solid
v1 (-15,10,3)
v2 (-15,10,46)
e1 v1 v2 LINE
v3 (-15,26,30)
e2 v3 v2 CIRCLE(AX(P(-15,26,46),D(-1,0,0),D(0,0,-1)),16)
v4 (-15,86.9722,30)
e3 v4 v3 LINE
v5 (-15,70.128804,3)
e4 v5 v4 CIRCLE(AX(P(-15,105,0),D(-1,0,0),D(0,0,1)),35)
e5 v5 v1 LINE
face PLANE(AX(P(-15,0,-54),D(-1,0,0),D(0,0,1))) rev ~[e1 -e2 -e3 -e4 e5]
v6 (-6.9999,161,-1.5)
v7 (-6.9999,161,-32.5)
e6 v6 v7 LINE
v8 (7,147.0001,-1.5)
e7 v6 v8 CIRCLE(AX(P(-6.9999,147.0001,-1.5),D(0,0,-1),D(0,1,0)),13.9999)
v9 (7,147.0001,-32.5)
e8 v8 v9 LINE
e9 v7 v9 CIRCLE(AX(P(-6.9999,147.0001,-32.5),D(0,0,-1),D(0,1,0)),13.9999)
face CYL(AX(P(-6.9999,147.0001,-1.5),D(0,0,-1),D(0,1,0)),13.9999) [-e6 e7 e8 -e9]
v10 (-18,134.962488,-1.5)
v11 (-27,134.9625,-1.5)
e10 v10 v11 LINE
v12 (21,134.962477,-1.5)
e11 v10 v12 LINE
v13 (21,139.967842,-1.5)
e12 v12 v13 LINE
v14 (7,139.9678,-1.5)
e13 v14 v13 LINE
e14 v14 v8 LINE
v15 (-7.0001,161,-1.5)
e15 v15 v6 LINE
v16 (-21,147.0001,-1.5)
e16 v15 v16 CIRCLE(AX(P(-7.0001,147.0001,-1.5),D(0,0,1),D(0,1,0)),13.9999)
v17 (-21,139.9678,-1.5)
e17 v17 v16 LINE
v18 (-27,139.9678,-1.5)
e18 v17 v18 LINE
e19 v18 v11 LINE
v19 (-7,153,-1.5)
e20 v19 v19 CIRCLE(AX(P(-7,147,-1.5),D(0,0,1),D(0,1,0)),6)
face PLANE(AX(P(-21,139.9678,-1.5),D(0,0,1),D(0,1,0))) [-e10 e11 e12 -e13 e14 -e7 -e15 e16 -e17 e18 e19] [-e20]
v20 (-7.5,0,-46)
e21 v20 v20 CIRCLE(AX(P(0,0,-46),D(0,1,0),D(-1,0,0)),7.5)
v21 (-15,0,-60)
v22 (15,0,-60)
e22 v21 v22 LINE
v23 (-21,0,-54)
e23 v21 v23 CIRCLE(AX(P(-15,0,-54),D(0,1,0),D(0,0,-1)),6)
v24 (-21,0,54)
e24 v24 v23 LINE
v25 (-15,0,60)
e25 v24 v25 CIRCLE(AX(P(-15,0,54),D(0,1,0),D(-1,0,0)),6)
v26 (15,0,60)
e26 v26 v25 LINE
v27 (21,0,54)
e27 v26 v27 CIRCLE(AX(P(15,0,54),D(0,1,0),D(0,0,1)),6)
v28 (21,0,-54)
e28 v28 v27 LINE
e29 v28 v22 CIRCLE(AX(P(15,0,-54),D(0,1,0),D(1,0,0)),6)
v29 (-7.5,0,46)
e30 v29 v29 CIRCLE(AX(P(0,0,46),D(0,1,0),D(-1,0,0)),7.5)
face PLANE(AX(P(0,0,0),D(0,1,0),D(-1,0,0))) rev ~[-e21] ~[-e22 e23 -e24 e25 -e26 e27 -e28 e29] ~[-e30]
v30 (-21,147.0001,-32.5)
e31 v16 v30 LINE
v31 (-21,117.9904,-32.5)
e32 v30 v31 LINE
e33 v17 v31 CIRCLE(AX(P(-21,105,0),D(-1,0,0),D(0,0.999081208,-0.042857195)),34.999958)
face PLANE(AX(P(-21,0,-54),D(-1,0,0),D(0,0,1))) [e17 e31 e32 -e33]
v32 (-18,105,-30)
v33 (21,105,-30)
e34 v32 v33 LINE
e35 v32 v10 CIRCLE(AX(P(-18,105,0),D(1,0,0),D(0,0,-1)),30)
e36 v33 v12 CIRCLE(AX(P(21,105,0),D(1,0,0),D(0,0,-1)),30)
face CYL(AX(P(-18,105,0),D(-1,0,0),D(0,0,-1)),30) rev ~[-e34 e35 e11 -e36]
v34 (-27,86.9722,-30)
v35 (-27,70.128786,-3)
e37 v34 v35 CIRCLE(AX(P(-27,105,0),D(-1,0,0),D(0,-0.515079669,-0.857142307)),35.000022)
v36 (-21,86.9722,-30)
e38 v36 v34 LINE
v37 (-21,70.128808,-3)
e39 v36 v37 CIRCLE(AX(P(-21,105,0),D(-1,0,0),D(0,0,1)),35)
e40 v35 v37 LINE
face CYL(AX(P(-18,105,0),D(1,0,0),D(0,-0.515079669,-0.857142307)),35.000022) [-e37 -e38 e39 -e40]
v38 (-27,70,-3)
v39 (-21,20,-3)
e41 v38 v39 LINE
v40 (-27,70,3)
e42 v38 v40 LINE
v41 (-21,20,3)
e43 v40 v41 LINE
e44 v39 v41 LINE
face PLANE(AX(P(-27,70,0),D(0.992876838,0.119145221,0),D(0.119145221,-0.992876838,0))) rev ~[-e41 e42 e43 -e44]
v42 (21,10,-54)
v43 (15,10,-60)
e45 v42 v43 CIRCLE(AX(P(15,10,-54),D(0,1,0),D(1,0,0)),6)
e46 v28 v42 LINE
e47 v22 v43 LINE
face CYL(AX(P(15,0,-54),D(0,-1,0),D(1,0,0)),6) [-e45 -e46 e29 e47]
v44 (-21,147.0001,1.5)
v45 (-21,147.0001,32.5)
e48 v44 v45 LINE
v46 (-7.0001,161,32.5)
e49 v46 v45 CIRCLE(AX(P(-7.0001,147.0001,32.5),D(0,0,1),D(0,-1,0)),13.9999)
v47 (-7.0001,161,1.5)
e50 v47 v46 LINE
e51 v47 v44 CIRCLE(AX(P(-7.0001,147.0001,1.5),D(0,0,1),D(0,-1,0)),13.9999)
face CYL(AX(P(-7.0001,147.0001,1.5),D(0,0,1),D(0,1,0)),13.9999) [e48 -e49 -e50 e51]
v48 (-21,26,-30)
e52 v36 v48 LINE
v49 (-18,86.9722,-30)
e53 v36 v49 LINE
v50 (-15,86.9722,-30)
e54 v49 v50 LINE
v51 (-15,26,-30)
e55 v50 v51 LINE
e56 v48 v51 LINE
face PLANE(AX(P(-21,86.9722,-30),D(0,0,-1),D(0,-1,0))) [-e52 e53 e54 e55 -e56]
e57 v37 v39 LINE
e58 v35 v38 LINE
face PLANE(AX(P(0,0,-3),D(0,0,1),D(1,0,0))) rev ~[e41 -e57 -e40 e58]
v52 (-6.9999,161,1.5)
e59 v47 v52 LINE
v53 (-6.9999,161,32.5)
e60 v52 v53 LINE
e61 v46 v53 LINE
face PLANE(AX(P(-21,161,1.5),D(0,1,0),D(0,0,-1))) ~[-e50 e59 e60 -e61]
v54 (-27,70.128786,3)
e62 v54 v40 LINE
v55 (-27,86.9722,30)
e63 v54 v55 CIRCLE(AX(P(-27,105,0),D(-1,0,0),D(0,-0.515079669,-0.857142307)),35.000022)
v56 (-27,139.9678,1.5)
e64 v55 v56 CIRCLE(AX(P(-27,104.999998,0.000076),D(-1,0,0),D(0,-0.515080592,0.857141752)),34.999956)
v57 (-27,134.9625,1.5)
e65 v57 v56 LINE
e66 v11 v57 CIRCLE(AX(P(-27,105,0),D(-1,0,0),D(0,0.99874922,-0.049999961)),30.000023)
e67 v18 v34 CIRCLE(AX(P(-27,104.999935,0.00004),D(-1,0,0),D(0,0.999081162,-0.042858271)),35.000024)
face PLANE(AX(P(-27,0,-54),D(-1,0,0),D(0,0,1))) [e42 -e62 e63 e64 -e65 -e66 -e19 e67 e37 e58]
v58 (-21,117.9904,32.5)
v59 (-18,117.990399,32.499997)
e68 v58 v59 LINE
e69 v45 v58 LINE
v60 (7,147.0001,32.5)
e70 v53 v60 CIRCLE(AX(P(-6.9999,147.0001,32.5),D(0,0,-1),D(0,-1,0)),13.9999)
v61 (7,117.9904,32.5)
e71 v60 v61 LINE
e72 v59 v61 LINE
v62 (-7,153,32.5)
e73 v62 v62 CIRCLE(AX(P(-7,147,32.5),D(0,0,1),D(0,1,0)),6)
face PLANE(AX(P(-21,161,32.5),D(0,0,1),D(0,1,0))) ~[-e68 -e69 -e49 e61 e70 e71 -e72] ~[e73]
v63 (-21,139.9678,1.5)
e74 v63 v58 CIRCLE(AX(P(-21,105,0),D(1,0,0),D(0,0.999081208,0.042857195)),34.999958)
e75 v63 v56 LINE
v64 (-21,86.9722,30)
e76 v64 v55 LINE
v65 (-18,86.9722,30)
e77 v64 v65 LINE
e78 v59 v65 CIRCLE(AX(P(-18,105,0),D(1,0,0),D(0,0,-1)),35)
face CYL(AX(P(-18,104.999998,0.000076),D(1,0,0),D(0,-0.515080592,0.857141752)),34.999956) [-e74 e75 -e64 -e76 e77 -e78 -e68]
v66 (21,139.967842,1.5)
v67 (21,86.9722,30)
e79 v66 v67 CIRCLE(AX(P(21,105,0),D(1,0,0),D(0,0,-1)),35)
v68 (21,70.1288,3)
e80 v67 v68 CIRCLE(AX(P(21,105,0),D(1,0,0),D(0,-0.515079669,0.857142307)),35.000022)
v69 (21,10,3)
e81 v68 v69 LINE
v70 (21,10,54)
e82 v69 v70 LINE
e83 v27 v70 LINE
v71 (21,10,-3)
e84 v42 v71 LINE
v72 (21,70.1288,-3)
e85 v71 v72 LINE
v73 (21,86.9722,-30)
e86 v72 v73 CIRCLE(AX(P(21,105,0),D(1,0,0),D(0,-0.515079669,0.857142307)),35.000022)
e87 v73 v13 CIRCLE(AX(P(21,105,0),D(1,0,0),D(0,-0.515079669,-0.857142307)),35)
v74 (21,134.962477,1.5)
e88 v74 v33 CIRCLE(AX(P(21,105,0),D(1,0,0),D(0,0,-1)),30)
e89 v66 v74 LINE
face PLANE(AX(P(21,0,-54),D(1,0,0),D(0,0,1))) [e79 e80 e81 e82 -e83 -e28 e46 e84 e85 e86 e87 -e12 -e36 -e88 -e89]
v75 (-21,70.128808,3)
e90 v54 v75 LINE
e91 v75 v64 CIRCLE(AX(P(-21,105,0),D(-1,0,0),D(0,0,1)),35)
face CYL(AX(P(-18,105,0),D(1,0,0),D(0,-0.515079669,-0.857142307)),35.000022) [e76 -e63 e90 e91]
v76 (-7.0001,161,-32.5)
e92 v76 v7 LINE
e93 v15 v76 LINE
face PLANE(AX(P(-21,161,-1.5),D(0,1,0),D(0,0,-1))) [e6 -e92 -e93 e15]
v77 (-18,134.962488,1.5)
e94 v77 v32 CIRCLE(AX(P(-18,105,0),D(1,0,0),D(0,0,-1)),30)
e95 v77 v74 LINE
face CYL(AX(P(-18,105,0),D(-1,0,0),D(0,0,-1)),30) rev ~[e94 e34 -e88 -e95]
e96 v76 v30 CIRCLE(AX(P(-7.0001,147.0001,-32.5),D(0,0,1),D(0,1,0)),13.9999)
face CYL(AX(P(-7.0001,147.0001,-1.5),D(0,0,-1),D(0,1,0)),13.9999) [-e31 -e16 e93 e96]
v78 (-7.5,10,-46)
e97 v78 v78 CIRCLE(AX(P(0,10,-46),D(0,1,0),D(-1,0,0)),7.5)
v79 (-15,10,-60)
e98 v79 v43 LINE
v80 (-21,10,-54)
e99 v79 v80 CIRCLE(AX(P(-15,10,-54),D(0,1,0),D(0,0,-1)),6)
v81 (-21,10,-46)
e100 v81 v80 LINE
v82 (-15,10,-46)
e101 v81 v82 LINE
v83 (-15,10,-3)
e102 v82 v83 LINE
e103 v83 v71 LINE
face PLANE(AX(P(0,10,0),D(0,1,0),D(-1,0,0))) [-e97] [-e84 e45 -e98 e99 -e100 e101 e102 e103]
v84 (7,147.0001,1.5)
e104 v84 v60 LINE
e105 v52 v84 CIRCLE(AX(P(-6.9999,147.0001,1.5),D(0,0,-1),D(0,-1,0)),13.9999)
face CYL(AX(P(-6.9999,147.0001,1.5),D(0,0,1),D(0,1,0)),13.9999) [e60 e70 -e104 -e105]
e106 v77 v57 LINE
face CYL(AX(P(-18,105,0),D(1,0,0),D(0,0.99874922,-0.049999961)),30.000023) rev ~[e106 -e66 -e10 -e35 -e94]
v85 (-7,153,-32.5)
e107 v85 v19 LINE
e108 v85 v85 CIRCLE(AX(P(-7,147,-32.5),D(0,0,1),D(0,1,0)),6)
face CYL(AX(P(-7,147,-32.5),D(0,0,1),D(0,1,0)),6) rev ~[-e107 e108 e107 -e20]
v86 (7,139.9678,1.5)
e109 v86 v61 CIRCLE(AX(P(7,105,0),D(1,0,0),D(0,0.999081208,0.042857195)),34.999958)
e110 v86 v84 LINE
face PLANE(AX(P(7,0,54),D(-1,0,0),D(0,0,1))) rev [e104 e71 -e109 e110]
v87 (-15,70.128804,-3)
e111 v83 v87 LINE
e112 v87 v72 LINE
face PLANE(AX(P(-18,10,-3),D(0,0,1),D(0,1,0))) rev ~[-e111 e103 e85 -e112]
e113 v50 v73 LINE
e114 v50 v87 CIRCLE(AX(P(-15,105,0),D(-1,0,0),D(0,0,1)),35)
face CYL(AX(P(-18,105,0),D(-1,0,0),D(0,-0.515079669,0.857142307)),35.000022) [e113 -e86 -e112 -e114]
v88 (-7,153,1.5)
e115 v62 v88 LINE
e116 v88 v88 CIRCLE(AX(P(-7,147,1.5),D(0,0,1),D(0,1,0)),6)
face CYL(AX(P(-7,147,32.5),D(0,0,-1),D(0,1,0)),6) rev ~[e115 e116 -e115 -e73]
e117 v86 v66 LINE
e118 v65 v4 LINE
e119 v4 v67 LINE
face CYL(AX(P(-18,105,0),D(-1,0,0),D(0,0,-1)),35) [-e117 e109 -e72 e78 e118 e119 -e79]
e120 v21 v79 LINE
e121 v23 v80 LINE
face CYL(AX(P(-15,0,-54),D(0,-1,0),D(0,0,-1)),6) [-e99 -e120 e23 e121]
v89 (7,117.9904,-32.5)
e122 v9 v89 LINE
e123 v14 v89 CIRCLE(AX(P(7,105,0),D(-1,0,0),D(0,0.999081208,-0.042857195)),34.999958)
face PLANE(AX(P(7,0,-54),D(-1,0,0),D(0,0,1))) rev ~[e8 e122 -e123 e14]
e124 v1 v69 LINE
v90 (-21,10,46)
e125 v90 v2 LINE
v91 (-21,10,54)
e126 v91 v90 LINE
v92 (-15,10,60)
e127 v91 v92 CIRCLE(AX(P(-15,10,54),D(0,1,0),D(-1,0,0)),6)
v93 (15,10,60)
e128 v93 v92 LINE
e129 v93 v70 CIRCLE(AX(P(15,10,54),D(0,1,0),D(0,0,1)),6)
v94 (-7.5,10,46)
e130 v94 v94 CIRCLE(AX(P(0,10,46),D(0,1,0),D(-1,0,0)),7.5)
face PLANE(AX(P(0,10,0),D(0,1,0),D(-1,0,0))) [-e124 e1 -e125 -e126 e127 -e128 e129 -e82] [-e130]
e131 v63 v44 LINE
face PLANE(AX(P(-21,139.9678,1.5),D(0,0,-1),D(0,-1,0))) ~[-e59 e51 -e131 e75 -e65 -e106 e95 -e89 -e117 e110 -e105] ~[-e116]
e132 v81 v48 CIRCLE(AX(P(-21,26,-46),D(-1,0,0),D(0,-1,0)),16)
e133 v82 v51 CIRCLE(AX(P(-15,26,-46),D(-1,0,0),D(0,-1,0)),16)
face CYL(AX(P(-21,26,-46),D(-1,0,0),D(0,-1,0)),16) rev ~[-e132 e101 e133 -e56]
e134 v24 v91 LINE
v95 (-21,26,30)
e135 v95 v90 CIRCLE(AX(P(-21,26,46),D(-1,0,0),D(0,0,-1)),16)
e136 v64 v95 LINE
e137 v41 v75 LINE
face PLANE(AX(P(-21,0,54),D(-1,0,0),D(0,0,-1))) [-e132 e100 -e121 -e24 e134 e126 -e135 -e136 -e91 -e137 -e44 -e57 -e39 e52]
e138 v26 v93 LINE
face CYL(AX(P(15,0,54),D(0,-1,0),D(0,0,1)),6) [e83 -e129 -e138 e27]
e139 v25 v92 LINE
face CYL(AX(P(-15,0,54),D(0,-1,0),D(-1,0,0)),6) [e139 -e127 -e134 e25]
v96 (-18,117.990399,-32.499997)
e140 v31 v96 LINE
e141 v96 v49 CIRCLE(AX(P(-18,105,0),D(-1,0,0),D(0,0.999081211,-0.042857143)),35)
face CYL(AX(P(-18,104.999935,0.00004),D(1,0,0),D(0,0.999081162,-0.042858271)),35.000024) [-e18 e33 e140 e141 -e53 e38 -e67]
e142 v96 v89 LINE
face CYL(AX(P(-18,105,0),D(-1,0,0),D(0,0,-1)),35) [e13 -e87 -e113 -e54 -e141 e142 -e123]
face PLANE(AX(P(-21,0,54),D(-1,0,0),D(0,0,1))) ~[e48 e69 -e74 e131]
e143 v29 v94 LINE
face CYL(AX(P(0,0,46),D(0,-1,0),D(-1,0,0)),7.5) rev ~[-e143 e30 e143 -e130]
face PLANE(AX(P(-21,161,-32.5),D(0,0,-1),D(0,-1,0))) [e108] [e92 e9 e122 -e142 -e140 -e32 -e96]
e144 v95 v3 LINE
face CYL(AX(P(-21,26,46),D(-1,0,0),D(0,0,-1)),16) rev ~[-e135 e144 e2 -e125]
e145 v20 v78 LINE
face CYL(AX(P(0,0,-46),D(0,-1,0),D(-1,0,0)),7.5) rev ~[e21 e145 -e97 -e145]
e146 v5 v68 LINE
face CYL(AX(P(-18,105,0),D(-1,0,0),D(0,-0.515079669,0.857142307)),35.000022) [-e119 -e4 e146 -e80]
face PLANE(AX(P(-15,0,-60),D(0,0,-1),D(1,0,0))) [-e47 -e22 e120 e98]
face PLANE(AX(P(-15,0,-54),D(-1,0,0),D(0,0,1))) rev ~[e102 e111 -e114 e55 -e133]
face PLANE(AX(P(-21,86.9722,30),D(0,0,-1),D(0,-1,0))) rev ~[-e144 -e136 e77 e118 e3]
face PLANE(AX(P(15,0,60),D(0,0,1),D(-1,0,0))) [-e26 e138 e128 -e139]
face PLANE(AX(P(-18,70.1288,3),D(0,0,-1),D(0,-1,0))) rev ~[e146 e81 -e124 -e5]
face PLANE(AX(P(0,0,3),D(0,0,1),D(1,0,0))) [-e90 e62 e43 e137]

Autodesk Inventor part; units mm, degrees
ref_plane "YZ Plane" through (0, 0, 0) normal (1, 0, 0) x (0, 1, 0)
ref_plane "XZ Plane" through (0, 0, 0) normal (0, 1, 0) x (-1, 0, 0)
sketch "Boceto1" plane through (0, 0, 0) normal (0, 1, 0) x (-1, 0, 0)
  line L0 (-15, 60) -> (15, 60)
  line L1 (21, 54) -> (21, -54)
  line L2 (15, -60) -> (-15, -60)
  line L3 (-21, -54) -> (-21, 54)
  line L4 (-21, 60) -> (21, -60) construction
  line L5 (21, 60) -> (-21, -60) construction
  arc A0 (21, 54) -> (15, 60) centre (15, 54) ccw
  arc A1 (-15, 60) -> (-21, 54) centre (-15, 54) ccw
  arc A2 (-21, -54) -> (-15, -60) centre (-15, -54) ccw
  arc A3 (15, -60) -> (21, -54) centre (15, -54) ccw
  circle A4 centre (0, 46) radius 7.5
  circle A5 centre (0, -46) radius 7.5
  point P0 (0, 0)
  dimension "d0" = 42
  dimension "d1" = 120
  dimension "d2" = 6
  dimension "d3" = 15
  dimension "d13" = 46
  dimension "d14" = 46
extrude "Extrusión1" add sketch "Boceto1" along normal blind 10
sketch "Boceto2" plane through (-21, 0, -54) normal (-1, 0, 0) x (0, 0, 1)
  line L0 (0, 10) -> (108, 10) construction
  line L1 (24, 86.9722) -> (24, 26)
  line L2 (84, 86.9722) -> (84, 26)
  line L3 (0, 0) -> (108, 0) projected
  arc A0 (84, 26) -> (100, 10) centre (100, 26) ccw
  arc A1 (8, 10) -> (24, 26) centre (8, 26) ccw
  line L4 (92.5, 10) -> (107.5, 10) construction
  line L5 (0.5, 10) -> (15.5, 10) construction
  circle A2 centre (54, 105) radius 35
  line L6 (8, 10) -> (100, 10)
  point P0 (54, 0)
  point P1 (24, 10)
  point P2 (84, 10)
  point P3 (54, 0)
  point P4 (54, 0)
  point P5 (54, 10)
  dimension "d10" = 16
  dimension "d16" = 35
  dimension "d17" = 95
extrude "Extrusión2" add sketch "Boceto2" against normal blind 6 contours A2 L2 A0 L6 A1 L1
ref_plane "Plano de trabajo1" through (-18, 0, -54) normal (1, 0, 0) x (0, 0, -1)
sketch "Boceto3" plane through (-18, 0, -54) normal (1, 0, 0) x (0, 0, -1)
  arc A0 (-84, 86.9722) -> (-24, 86.9722) centre (-54, 105) ccw projected
  circle A1 centre (-54, 105) radius 35
  circle A2 centre (-54, 105) radius 30
  line L0 (-57, 10) -> (-51, 10)
  line L1 (-51, 10) -> (-51, 70.1288)
  line L2 (-51, 70.1288) -> (-57, 70.1288)
  line L3 (-57, 70.1288) -> (-57, 10)
  line L4 (-57, 10) -> (-51, 70.1288) construction
  line L5 (-51, 10) -> (-57, 70.1288) construction
  line L6 (-8, 10) -> (-100, 10) projected
  line L7 (-55.5, 105) -> (-52.5, 105)
  line L8 (-52.5, 105) -> (-52.5, 175)
  line L9 (-52.5, 175) -> (-55.5, 175)
  line L10 (-55.5, 175) -> (-55.5, 105)
  line L11 (-55.5, 105) -> (-52.5, 175) construction
  line L12 (-52.5, 105) -> (-55.5, 175) construction
  point P0 (-54, 0)
  point P1 (-54, 40.0644)
  point P2 (-54, 140)
  point P3 (-55.5, 134.9625)
  point P4 (-55.5, 139.9678)
  point P5 (-52.5, 139.9678)
  point P6 (-52.5, 134.9625)
  dimension "d23" = 39
  dimension "d20" = 30
  dimension "d21" = 6
  dimension "d22" = 3
extrude "Extrusión3" add sketch "Boceto3" along normal up to surface (39 mm away) contours A1 L10 A2 L8 A0 L2 | L2 A0 | A0 L1 L0 L3
sketch "Boceto4" plane through (-18, 0, -54) normal (-1, 0, 0) x (0, 0, 1)
  arc A0 (24, 86.9722) -> (84, 86.9722) centre (54, 105) ccw projected
  arc A1 (84, 86.9722) -> (55.5, 139.9678) centre (54, 105) ccw projected
  line L0 (55.5, 134.9625) -> (55.5, 139.9678) projected
  arc A2 (52.5, 134.9625) -> (55.5, 134.9625) centre (54, 105) ccw projected
  line L1 (52.5, 139.9678) -> (52.5, 134.9625) projected
  arc A3 (52.5, 139.9678) -> (24, 86.9722) centre (54, 105) ccw projected
  point P0 (54, 0)
extrude "Extrusión4" add sketch "Boceto4" along normal blind 9
sketch "Sketch6" plane through (-21, 0, -54) normal (-1, 0, 0) x (0, 0, 1)
  arc A0 (52.5, 139.9678) -> (55.5, 139.9678) centre (54, 105) ccw projected
  line L0 (52.5, 139.9678) -> (52.5, 161)
  line L1 (52.5, 161) -> (21.5, 161)
  line L2 (21.5, 161) -> (21.5, 117.9904)
  line L3 (21.5, 147) -> (52.5, 147) construction
  point P0 (54, 0)
  dimension "d30" = 31
  dimension "d31" = 42
  dimension "d32" = 14
extrude "Extrusion5" add sketch "Sketch6" against normal blind 28
fillet "Fillet1" radius 14 2 edges at (7, 161, -17) (-21, 161, -17)
sketch "Sketch7" plane through (7, 117.9904, -32.5) normal (0, 0, -1) x (-1, 0, 0)
  arc A0 (28, 29.0096) -> (0, 29.0096) centre (14, 29.0096) ccw projected
  point P0 (7, -117.9904)
hole "Hole1" at (-7, 147, -32.5) direction (0, 0, 1) diameter 12 depth 31
mirror "Mirror1" about plane through (0, 0, 0) normal (0, 0, 1) of "Extrusion5", "Fillet1", "Hole1"
sketch "Sketch8" plane through (0, 0, 0) normal (0, 0, 1) x (1, 0, 0)
  line L0 (-27, 70) -> (-21, 70) projected
  line L1 (-21, 0) -> (-21, 10) projected
  line L2 (-21, 10) -> (-21, 26) projected
  line L3 (-21, 26) -> (-21, 86.9722) projected
  line L4 (-21, 86.9722) -> (-21, 86.9722) projected
  line L5 (-21, 86.9722) -> (-21, 26) projected
  line L6 (-21, 26) -> (-21, 10) projected
  line L7 (-21, 0) -> (-21, 10) projected
  line L8 (-27, 70) -> (-21, 20)
  line L9 (-27, 139.9678) -> (-27, 70) projected
  line L10 (-27, 70) -> (-27, 73)
  line L11 (-27, 73) -> (-21, 73)
  point P0 (0, 0)
  dimension "d43" = 20
  dimension "d44" = 3
extrude "Extrusion6" add sketch "Sketch8" along normal mid plane 6
